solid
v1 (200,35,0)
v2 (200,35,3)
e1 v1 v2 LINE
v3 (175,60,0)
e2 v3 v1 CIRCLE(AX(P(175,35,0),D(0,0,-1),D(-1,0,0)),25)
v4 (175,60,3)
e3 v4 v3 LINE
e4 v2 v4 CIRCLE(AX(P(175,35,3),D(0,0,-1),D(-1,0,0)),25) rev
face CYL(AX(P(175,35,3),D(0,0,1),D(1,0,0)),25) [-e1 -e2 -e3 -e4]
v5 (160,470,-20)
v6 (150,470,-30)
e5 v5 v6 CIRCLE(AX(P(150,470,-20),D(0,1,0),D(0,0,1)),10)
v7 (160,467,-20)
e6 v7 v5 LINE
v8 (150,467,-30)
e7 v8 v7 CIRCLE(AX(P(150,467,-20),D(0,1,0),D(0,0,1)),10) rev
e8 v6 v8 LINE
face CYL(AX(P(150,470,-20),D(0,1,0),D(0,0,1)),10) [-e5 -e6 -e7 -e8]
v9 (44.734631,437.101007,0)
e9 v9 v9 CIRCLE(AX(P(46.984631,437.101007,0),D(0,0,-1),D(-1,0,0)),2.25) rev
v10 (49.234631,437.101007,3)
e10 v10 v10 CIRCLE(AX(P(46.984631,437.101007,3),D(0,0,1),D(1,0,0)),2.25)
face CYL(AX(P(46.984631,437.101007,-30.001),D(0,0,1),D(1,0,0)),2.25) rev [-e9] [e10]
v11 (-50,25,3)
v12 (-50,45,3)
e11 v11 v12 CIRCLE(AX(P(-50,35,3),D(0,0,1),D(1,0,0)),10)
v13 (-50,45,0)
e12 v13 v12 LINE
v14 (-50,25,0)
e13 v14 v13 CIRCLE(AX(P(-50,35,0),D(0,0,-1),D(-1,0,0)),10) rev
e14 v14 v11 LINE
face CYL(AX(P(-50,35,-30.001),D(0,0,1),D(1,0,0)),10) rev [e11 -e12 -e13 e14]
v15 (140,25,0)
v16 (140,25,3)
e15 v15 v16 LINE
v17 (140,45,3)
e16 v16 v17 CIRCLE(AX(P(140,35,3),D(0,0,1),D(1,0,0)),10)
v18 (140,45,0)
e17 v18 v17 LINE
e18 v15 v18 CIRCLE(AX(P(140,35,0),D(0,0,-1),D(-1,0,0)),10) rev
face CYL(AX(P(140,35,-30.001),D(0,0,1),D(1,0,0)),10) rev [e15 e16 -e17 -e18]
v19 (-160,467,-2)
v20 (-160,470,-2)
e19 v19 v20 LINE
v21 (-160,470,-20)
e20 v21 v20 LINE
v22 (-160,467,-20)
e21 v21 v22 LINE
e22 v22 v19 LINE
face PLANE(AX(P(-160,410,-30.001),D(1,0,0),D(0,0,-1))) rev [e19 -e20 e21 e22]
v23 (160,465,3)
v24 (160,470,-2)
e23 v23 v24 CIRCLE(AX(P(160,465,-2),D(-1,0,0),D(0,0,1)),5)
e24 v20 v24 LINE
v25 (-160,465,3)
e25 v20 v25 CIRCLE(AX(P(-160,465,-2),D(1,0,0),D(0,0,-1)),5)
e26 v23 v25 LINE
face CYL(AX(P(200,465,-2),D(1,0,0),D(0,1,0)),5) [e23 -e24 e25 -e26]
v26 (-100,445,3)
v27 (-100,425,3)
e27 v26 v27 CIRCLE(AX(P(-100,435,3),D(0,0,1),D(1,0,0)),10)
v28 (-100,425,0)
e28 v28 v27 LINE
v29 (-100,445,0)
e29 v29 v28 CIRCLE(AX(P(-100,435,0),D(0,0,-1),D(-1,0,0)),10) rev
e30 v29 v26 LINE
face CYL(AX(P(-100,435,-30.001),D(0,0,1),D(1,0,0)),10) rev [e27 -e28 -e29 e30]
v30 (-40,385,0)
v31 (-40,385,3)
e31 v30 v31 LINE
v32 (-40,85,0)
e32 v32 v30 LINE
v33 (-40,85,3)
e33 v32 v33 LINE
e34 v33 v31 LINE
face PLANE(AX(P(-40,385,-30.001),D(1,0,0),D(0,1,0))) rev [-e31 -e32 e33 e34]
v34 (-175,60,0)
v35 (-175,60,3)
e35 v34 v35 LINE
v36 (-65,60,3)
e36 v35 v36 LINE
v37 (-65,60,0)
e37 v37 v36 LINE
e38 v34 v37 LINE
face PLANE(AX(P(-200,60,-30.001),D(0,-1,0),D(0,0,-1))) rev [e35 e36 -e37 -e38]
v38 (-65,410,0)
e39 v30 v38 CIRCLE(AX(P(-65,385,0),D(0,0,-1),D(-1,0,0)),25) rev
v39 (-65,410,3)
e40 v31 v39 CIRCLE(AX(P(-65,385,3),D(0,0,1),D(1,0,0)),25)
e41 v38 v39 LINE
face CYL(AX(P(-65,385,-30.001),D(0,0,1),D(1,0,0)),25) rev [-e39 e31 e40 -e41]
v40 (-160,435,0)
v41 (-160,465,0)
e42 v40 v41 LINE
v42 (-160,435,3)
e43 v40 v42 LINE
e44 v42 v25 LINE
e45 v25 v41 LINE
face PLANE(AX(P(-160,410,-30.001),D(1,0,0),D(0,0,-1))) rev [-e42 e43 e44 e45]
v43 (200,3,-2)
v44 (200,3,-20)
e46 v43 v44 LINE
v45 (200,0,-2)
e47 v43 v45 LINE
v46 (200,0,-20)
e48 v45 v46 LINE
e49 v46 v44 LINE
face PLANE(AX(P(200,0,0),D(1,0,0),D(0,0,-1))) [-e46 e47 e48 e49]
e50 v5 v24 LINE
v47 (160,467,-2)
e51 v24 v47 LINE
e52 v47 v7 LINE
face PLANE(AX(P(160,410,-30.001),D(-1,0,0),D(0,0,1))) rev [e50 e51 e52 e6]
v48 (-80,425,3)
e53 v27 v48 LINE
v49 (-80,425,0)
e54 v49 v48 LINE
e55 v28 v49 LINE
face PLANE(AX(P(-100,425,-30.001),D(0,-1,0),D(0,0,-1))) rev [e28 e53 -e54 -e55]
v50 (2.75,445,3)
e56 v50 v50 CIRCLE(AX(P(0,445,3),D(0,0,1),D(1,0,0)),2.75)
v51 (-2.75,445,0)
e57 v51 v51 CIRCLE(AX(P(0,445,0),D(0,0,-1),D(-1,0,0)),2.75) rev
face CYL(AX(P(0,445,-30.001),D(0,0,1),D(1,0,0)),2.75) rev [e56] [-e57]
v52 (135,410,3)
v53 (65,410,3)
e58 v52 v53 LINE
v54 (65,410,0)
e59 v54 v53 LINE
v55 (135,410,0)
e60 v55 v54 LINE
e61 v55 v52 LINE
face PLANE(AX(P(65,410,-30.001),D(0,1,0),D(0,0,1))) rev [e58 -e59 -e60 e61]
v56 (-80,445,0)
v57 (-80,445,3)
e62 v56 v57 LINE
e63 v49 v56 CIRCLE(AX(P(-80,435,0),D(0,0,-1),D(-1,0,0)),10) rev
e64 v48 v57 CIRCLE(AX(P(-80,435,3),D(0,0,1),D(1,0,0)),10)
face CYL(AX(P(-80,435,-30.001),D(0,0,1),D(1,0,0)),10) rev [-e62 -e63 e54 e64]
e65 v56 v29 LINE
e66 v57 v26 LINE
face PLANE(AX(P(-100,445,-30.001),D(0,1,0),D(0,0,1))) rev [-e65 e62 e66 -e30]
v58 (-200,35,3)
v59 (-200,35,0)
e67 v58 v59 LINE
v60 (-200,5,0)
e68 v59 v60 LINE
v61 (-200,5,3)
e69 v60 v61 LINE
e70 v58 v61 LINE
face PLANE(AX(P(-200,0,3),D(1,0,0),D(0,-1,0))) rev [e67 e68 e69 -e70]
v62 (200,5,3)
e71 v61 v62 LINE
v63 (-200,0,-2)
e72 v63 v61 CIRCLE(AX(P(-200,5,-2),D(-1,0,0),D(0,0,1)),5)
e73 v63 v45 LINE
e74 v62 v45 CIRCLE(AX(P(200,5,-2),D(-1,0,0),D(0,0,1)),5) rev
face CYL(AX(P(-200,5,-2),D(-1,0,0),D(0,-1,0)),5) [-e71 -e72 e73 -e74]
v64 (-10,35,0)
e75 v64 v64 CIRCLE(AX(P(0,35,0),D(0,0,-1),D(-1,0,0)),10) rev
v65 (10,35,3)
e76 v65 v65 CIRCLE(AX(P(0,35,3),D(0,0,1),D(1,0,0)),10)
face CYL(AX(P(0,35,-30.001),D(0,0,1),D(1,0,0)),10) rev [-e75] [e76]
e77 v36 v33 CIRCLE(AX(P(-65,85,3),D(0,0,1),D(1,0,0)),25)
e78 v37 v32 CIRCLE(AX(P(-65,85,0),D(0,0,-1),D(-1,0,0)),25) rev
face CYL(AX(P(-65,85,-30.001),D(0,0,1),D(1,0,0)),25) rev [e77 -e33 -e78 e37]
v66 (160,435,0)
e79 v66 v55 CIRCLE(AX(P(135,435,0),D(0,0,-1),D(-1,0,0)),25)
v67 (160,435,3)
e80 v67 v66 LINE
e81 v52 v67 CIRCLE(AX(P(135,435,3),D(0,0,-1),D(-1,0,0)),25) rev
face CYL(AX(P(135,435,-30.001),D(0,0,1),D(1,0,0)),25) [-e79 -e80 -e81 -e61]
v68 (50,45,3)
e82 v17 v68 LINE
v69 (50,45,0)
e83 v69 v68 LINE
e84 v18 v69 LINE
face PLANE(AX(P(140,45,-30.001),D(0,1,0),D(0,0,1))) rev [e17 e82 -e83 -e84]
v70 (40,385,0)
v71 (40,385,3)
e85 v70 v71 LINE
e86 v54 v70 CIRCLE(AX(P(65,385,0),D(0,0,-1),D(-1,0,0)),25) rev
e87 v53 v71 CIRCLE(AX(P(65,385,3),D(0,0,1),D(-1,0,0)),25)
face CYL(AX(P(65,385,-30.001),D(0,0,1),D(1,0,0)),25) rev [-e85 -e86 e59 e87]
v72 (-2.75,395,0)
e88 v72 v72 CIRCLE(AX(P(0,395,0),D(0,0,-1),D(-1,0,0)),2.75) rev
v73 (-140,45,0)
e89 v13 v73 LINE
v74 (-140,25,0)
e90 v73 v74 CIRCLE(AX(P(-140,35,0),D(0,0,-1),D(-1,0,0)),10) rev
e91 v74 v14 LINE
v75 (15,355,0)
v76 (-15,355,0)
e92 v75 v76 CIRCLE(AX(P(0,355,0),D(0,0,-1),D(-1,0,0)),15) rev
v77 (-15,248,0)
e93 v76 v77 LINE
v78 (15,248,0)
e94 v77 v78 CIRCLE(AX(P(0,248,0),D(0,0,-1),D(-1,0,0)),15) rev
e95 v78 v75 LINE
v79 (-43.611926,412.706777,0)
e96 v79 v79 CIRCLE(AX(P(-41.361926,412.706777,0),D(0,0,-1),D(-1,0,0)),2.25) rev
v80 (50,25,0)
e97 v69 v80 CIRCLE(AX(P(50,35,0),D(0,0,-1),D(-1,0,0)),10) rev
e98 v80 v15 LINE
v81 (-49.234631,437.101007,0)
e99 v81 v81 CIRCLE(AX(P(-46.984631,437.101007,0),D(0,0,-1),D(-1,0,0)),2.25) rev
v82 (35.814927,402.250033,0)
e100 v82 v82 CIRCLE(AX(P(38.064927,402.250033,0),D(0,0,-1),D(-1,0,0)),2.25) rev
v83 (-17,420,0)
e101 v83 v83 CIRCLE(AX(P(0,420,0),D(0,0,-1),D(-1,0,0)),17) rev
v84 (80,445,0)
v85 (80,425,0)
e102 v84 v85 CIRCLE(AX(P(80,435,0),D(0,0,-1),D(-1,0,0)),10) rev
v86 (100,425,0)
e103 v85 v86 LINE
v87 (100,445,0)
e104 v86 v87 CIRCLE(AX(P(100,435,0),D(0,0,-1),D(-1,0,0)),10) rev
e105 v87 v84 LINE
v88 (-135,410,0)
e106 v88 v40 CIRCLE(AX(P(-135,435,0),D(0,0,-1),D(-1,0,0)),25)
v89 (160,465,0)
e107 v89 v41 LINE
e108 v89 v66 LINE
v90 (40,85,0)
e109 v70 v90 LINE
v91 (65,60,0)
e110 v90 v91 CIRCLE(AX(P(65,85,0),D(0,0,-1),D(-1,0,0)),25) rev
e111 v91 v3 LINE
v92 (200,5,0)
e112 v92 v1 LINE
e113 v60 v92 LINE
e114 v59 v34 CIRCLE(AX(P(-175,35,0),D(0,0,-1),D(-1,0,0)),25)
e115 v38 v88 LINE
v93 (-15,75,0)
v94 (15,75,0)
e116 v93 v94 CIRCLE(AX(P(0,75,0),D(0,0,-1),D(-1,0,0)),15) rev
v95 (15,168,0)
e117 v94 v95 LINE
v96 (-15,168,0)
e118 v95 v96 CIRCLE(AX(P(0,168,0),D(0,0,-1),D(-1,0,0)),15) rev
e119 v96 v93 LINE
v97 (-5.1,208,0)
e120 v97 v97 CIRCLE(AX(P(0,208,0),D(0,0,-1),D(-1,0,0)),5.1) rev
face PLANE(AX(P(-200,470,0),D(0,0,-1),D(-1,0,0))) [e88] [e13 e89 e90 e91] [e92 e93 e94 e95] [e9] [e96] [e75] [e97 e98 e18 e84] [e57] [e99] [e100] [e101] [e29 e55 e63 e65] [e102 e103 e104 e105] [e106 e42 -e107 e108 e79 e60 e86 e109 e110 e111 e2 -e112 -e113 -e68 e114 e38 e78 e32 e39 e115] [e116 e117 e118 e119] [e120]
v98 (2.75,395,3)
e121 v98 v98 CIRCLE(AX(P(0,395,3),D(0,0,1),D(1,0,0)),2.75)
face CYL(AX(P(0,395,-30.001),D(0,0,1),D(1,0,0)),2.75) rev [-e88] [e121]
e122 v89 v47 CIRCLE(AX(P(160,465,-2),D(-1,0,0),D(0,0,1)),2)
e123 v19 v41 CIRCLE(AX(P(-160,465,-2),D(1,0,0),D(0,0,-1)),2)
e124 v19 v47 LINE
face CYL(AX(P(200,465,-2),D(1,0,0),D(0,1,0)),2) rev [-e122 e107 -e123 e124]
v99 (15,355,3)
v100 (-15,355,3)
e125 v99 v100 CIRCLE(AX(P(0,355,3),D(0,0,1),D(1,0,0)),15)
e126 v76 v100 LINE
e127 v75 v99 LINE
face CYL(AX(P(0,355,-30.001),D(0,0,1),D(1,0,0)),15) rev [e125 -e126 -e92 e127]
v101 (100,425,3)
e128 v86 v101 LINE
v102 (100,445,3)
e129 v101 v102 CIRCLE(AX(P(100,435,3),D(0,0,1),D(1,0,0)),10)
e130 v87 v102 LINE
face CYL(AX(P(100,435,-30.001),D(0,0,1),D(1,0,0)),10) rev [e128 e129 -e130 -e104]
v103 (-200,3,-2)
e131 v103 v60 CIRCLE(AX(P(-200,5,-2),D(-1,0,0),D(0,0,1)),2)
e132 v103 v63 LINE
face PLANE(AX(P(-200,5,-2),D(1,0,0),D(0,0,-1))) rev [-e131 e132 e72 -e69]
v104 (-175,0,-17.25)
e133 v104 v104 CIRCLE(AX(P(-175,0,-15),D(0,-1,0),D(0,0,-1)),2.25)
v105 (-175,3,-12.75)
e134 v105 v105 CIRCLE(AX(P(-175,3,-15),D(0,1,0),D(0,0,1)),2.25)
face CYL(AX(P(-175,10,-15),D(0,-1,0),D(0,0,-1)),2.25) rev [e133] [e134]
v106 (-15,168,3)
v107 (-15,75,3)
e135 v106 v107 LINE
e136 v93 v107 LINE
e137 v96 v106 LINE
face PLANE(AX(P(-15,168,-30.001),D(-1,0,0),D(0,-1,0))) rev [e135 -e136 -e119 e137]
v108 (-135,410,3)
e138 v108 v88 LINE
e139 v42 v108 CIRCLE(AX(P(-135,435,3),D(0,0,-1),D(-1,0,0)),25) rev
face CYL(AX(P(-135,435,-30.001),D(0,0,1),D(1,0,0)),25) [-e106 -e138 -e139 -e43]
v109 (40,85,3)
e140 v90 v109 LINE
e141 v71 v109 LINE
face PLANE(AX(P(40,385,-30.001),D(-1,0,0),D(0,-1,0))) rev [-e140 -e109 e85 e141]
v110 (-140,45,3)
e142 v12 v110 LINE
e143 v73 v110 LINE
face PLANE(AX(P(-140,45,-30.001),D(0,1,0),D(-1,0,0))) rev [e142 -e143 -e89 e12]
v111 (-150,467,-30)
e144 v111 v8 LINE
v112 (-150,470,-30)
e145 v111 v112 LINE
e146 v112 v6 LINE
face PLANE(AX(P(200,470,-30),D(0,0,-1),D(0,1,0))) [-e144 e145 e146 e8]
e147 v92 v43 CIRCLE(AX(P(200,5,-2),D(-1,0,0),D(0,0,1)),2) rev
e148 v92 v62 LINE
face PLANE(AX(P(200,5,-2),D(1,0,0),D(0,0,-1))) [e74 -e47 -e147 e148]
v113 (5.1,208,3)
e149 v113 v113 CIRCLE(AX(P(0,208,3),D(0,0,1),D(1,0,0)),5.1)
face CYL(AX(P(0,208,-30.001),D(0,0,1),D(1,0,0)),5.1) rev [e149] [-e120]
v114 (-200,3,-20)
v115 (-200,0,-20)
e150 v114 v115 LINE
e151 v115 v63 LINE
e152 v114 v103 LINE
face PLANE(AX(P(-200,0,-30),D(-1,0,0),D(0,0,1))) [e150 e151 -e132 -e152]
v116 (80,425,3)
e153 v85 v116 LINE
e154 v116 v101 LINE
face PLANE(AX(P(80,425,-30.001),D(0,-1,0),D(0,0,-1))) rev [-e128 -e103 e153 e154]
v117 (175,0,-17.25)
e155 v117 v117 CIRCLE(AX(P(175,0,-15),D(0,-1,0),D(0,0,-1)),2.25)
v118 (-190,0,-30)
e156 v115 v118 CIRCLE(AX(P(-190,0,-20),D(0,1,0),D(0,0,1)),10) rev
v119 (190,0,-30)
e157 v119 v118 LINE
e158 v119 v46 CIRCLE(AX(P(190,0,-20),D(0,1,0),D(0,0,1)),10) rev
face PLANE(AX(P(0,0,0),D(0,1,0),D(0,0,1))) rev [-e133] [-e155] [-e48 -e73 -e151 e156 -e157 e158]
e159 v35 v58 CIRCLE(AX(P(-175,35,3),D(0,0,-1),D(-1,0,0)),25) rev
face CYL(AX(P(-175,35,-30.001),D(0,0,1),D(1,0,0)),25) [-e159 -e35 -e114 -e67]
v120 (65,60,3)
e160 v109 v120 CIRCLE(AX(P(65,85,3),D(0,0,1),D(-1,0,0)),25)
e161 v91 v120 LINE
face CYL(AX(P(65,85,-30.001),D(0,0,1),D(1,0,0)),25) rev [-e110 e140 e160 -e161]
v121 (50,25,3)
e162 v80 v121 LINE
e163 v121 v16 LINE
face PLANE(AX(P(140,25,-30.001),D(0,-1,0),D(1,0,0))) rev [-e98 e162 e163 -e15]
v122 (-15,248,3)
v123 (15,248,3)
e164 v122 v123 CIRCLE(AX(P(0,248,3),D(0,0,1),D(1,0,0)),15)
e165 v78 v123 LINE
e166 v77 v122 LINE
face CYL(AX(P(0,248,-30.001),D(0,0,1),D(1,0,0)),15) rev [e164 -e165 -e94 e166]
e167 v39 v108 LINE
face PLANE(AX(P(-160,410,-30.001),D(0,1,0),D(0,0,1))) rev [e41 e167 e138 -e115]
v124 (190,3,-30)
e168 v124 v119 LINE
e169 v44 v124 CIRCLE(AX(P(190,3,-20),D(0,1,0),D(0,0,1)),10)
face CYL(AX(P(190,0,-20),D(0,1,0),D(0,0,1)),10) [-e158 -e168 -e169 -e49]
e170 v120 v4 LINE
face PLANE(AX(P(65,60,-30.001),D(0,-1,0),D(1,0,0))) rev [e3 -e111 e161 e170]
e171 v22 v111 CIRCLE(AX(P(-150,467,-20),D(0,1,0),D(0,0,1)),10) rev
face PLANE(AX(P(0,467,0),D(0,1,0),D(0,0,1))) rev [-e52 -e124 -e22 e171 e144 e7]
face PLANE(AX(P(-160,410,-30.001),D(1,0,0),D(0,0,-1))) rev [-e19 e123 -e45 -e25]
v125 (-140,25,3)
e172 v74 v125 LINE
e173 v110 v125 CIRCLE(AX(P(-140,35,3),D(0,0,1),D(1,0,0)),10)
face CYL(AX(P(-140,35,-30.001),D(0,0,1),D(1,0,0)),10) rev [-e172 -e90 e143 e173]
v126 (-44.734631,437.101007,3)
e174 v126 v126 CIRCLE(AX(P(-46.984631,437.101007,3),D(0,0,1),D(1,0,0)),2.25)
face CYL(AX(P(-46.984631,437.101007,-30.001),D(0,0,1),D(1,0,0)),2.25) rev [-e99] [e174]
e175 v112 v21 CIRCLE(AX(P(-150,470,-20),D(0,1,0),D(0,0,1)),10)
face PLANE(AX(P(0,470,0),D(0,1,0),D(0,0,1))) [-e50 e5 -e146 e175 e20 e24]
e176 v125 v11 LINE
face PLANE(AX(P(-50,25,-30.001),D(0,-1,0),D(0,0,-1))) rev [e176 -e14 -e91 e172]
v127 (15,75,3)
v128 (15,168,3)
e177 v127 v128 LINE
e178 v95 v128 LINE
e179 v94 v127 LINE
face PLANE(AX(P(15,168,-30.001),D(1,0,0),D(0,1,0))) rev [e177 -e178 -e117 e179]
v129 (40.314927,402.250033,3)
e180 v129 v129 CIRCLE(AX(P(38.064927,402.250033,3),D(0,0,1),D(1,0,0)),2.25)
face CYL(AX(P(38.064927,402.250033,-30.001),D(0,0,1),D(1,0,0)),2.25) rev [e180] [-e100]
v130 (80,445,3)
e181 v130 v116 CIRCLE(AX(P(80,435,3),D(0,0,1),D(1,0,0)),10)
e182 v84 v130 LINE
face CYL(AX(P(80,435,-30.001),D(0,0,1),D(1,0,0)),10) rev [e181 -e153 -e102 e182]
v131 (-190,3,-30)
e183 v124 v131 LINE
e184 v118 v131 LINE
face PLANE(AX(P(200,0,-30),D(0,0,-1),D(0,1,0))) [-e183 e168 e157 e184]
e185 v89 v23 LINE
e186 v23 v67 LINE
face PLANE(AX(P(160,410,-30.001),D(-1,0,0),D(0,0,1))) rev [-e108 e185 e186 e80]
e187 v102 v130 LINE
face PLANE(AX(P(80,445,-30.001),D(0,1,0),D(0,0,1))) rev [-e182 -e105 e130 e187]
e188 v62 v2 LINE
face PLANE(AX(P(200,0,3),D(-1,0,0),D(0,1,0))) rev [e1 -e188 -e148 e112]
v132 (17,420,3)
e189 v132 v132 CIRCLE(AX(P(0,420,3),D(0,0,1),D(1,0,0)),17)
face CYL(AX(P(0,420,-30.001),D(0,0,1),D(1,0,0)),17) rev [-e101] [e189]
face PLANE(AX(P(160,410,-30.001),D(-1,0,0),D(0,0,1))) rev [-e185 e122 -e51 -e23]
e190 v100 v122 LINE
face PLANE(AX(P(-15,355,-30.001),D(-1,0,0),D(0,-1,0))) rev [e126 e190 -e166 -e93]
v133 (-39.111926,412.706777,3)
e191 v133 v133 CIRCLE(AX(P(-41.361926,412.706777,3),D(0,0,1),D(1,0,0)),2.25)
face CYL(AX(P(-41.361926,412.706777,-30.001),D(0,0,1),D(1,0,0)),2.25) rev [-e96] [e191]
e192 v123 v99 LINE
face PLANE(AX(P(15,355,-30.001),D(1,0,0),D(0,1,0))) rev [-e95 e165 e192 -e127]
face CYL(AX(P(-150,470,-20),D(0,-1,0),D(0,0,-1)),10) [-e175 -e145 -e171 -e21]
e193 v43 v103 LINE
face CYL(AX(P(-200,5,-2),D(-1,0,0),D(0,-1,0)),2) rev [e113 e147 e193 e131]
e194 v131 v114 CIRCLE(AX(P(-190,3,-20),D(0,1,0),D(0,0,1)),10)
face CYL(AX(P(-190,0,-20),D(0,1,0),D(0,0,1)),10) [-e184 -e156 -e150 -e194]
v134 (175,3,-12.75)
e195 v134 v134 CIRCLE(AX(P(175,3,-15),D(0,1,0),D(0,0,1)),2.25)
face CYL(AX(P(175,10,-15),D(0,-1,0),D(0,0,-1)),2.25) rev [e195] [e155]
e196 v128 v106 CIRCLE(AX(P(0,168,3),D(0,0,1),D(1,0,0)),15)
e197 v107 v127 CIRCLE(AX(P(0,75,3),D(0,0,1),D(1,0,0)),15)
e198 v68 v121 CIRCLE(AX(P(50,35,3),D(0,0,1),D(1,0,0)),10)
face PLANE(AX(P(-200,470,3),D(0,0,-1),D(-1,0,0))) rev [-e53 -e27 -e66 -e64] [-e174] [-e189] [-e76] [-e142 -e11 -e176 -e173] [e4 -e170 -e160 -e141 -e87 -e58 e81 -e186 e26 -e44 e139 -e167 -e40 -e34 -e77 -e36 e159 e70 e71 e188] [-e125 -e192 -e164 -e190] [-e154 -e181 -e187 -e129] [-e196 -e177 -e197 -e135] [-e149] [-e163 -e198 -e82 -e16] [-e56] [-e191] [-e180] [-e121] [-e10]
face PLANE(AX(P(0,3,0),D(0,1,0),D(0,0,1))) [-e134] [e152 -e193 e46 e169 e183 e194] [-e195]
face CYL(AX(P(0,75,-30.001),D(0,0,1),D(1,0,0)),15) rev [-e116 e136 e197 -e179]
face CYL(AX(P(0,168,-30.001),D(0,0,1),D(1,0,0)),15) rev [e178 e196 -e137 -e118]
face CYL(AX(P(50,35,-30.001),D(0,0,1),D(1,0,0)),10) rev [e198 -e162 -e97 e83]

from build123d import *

# Parameters (mm, degrees)
ESQUISSE1_W                             = 400
ESQUISSE1_H                             = 470
BOSS_EXTRU_1_DEPTH                      = 3
T_LE_PLI_E_SUR_AR_TE1_STRIP_W           = 16
T_LE_PLI_E_SUR_AR_TE1_STRIP_H           = 3
T_LE_PLI_E_SUR_AR_TE1_STRIP_CUT_DEPTH   = 400
T_LE_PLI_E_SUR_AR_TE1_STRIP_2_W         = 16
T_LE_PLI_E_SUR_AR_TE1_STRIP_2_H         = 3
T_LE_PLI_E_SUR_AR_TE1_STRIP_CUT_2_DEPTH = 400
T_LE_PLI_E_SUR_AR_TE1_DEPTH             = 400
T_LE_PLI_E_SUR_AR_TE1_BEND_DEPTH        = 400
ENL_V_MAT_EXTRU_1_REACH                 = 513.849
ESQUISSE7_R                             = 17
ESQUISSE7_R_2                           = 5.1
ESQUISSE7_R_3                           = 2.75
ENL_V_MAT_EXTRU_2_REACH                 = 513.849
ESQUISSE12_R                            = 2.25
ESQUISSE12_R_2                          = 10
CONG_10_R                               = 10
CONG_2_R                                = 25
ESQUISSE13_R                            = 2.25
ENL_V_MAT_EXTRU_3_DEPTH                 = 10


# Sheet-metal steps are written as plain solids
with BuildPart() as part:
    # Esquisse1 → Boss.-Extru.1 (new body)
    with BuildSketch(Plane.XY):
        with Locations((0, 235)):
            Rectangle(ESQUISSE1_W, ESQUISSE1_H)
    extrude(amount=BOSS_EXTRU_1_DEPTH)

    # Tôle pliée sur arête1 strip (across the edge) → Tôle pliée sur arête1 strip cut (cut)
    with BuildSketch(Plane(origin=(-200, 470, 0), x_dir=(0, -1, 0), z_dir=(1, 0, 0))):
        with Locations((-3, -1.5)):
            Rectangle(T_LE_PLI_E_SUR_AR_TE1_STRIP_W, T_LE_PLI_E_SUR_AR_TE1_STRIP_H)
    extrude(amount=T_LE_PLI_E_SUR_AR_TE1_STRIP_CUT_DEPTH, mode=Mode.SUBTRACT)

    # Tôle pliée sur arête1 strip 2 (across the edge) → Tôle pliée sur arête1 strip cut 2 (cut)
    with BuildSketch(Plane(origin=(200, 0, 0), x_dir=(0, 1, 0), z_dir=(-1, 0, 0))):
        with Locations((-3, -1.5)):
            Rectangle(T_LE_PLI_E_SUR_AR_TE1_STRIP_2_W, T_LE_PLI_E_SUR_AR_TE1_STRIP_2_H)
    extrude(amount=T_LE_PLI_E_SUR_AR_TE1_STRIP_CUT_2_DEPTH, mode=Mode.SUBTRACT)

    # Tôle pliée sur arête1 section (across the edge) → Tôle pliée sur arête1 (add)
    with BuildSketch(Plane(origin=(-200, 470, 0), x_dir=(0, -1, 0), z_dir=(1, 0, 0))):
        with BuildLine():
            Line((0, 2), (0, 30))
            Line((0, 30), (3, 30))
            Line((3, 30), (3, 2))
            ThreePointArc((3, 2), (3.585786438, 0.585786438), (5, 0))
            Line((5, 0), (5, -3))
            ThreePointArc((5, -3), (1.464466094, -1.535533906), (0, 2))
        make_face()
    extrude(amount=T_LE_PLI_E_SUR_AR_TE1_DEPTH)

    # Tôle pliée sur arête1 section 2 (across the edge) → Tôle pliée sur arête1 bend (add)
    with BuildSketch(Plane(origin=(200, 0, 0), x_dir=(0, 1, 0), z_dir=(-1, 0, 0))):
        with BuildLine():
            Line((0, 2), (0, 30))
            Line((0, 30), (3, 30))
            Line((3, 30), (3, 2))
            ThreePointArc((3, 2), (3.585786438, 0.585786438), (5, 0))
            Line((5, 0), (5, -3))
            ThreePointArc((5, -3), (1.464466094, -1.535533906), (0, 2))
        make_face()
    extrude(amount=T_LE_PLI_E_SUR_AR_TE1_BEND_DEPTH)

    # Esquisse7 → Enlèv. mat.-Extru.1 (cut, up to next)
    with BuildSketch(Plane.XY.offset(3), mode=Mode.PRIVATE) as enl_v_mat_extru_1_sk1:
        with Locations((0, 420)):
            Circle(ESQUISSE7_R)
    enl_v_mat_extru_1_tool1 = extrude(enl_v_mat_extru_1_sk1.sketch, amount=-ENL_V_MAT_EXTRU_1_REACH, mode=Mode.PRIVATE) & part.part
    # Esquisse7 → Enlèv. mat.-Extru.1 (cut, up to next)
    with BuildSketch(Plane.XY.offset(3), mode=Mode.PRIVATE) as enl_v_mat_extru_1_sk2:
        with Locations((0, 208)):
            Circle(ESQUISSE7_R_2)
    enl_v_mat_extru_1_tool2 = extrude(enl_v_mat_extru_1_sk2.sketch, amount=-ENL_V_MAT_EXTRU_1_REACH, mode=Mode.PRIVATE) & part.part
    # Esquisse7 → Enlèv. mat.-Extru.1 (cut, up to next)
    with BuildSketch(Plane.XY.offset(3), mode=Mode.PRIVATE) as enl_v_mat_extru_1_sk3:
        with Locations((0, 395)):
            Circle(ESQUISSE7_R_3)
    enl_v_mat_extru_1_tool3 = extrude(enl_v_mat_extru_1_sk3.sketch, amount=-ENL_V_MAT_EXTRU_1_REACH, mode=Mode.PRIVATE) & part.part
    # Esquisse7 → Enlèv. mat.-Extru.1 (cut, up to next)
    with BuildSketch(Plane.XY.offset(3), mode=Mode.PRIVATE) as enl_v_mat_extru_1_sk4:
        with Locations((0, 445)):
            Circle(ESQUISSE7_R_3)
    enl_v_mat_extru_1_tool4 = extrude(enl_v_mat_extru_1_sk4.sketch, amount=-ENL_V_MAT_EXTRU_1_REACH, mode=Mode.PRIVATE) & part.part
    # Esquisse7 → Enlèv. mat.-Extru.1 (cut, up to next)
    with BuildSketch(Plane.XY.offset(3), mode=Mode.PRIVATE) as enl_v_mat_extru_1_sk5:
        with BuildLine():
            Line((-200, 60), (-65, 60))
            ThreePointArc((-65, 60), (-47.32233047, 67.32233047), (-40, 85))
            Line((-40, 85), (-40, 385))
            ThreePointArc((-40, 385), (-47.32233047, 402.67766953), (-65, 410))
            Line((-65, 410), (-160, 410))
            Line((-160, 410), (-160, 470))
            Line((-160, 470), (-200, 470))
            Line((-200, 470), (-200, 60))
        make_face()
    enl_v_mat_extru_1_tool5 = extrude(enl_v_mat_extru_1_sk5.sketch, amount=-ENL_V_MAT_EXTRU_1_REACH, mode=Mode.PRIVATE) & part.part
    # Esquisse7 → Enlèv. mat.-Extru.1 (cut, up to next)
    with BuildSketch(Plane.XY.offset(3), mode=Mode.PRIVATE) as enl_v_mat_extru_1_sk6:
        with BuildLine():
            Line((200.093993977, 470), (200.093993977, 60))
            Line((200.093993977, 60), (65, 60))
            ThreePointArc((65, 60), (47.32233047, 67.32233047), (40, 85))
            Line((40, 85), (40, 385))
            ThreePointArc((40, 385), (47.32233047, 402.67766953), (65, 410))
            Line((65, 410), (160, 410))
            Line((160, 410), (160, 470))
            Line((160, 470), (200.093993977, 470))
        make_face()
    enl_v_mat_extru_1_tool6 = extrude(enl_v_mat_extru_1_sk6.sketch, amount=-ENL_V_MAT_EXTRU_1_REACH, mode=Mode.PRIVATE) & part.part
    add(enl_v_mat_extru_1_tool1.solids().sort_by_distance((0, 420, 3))[0], mode=Mode.SUBTRACT)
    add(enl_v_mat_extru_1_tool2.solids().sort_by_distance((0, 208, 3))[0], mode=Mode.SUBTRACT)
    add(enl_v_mat_extru_1_tool3.solids().sort_by_distance((0, 395, 3))[0], mode=Mode.SUBTRACT)
    add(enl_v_mat_extru_1_tool4.solids().sort_by_distance((0, 445, 3))[0], mode=Mode.SUBTRACT)
    add(enl_v_mat_extru_1_tool5.solids().sort_by_distance((-122.820528, 243.463534, 3))[0], mode=Mode.SUBTRACT)
    add(enl_v_mat_extru_1_tool6.solids().sort_by_distance((122.87169, 243.477801, 3))[0], mode=Mode.SUBTRACT)

    # Esquisse12 → Enlèv. mat.-Extru.2 (cut, up to next)
    with BuildSketch(Plane.XY.offset(3), mode=Mode.PRIVATE) as enl_v_mat_extru_2_sk1:
        with Locations((38.064927056, 402.250033007)):
            Circle(ESQUISSE12_R)
    enl_v_mat_extru_2_tool1 = extrude(enl_v_mat_extru_2_sk1.sketch, amount=-ENL_V_MAT_EXTRU_2_REACH, mode=Mode.PRIVATE) & part.part
    # Esquisse12 → Enlèv. mat.-Extru.2 (cut, up to next)
    with BuildSketch(Plane.XY.offset(3), mode=Mode.PRIVATE) as enl_v_mat_extru_2_sk2:
        with Locations((-41.361925627, 412.706776538)):
            Circle(ESQUISSE12_R)
    enl_v_mat_extru_2_tool2 = extrude(enl_v_mat_extru_2_sk2.sketch, amount=-ENL_V_MAT_EXTRU_2_REACH, mode=Mode.PRIVATE) & part.part
    # Esquisse12 → Enlèv. mat.-Extru.2 (cut, up to next)
    with BuildSketch(Plane.XY.offset(3), mode=Mode.PRIVATE) as enl_v_mat_extru_2_sk3:
        with Locations((46.984631039, 437.101007166)):
            Circle(ESQUISSE12_R)
    enl_v_mat_extru_2_tool3 = extrude(enl_v_mat_extru_2_sk3.sketch, amount=-ENL_V_MAT_EXTRU_2_REACH, mode=Mode.PRIVATE) & part.part
    # Esquisse12 → Enlèv. mat.-Extru.2 (cut, up to next)
    with BuildSketch(Plane.XY.offset(3), mode=Mode.PRIVATE) as enl_v_mat_extru_2_sk4:
        with Locations((-46.984631039, 437.101007166)):
            Circle(ESQUISSE12_R)
    enl_v_mat_extru_2_tool4 = extrude(enl_v_mat_extru_2_sk4.sketch, amount=-ENL_V_MAT_EXTRU_2_REACH, mode=Mode.PRIVATE) & part.part
    # Esquisse12 → Enlèv. mat.-Extru.2 (cut, up to next)
    with BuildSketch(Plane.XY.offset(3), mode=Mode.PRIVATE) as enl_v_mat_extru_2_sk5:
        with Locations((0, 35)):
            Circle(ESQUISSE12_R_2)
    enl_v_mat_extru_2_tool5 = extrude(enl_v_mat_extru_2_sk5.sketch, amount=-ENL_V_MAT_EXTRU_2_REACH, mode=Mode.PRIVATE) & part.part
    # Esquisse12 → Enlèv. mat.-Extru.2 (cut, up to next)
    with BuildSketch(Plane.XY.offset(3), mode=Mode.PRIVATE) as enl_v_mat_extru_2_sk6:
        with BuildLine():
            Line((-15, 168), (-15, 75))
            ThreePointArc((-15, 75), (0, 60), (15, 75))
            Line((15, 75), (15, 168))
            ThreePointArc((15, 168), (0, 183), (-15, 168))
        make_face()
    enl_v_mat_extru_2_tool6 = extrude(enl_v_mat_extru_2_sk6.sketch, amount=-ENL_V_MAT_EXTRU_2_REACH, mode=Mode.PRIVATE) & part.part
    # Esquisse12 → Enlèv. mat.-Extru.2 (cut, up to next)
    with BuildSketch(Plane.XY.offset(3), mode=Mode.PRIVATE) as enl_v_mat_extru_2_sk7:
        with BuildLine():
            Line((140, 45), (50, 45))
            ThreePointArc((50, 45), (40, 35), (50, 25))
            Line((50, 25), (140, 25))
            ThreePointArc((140, 25), (150, 35), (140, 45))
        make_face()
    enl_v_mat_extru_2_tool7 = extrude(enl_v_mat_extru_2_sk7.sketch, amount=-ENL_V_MAT_EXTRU_2_REACH, mode=Mode.PRIVATE) & part.part
    # Esquisse12 → Enlèv. mat.-Extru.2 (cut, up to next)
    with BuildSketch(Plane.XY.offset(3), mode=Mode.PRIVATE) as enl_v_mat_extru_2_sk8:
        with BuildLine():
            Line((15, 355), (15, 248))
            ThreePointArc((15, 248), (0, 233), (-15, 248))
            Line((-15, 248), (-15, 355))
            ThreePointArc((-15, 355), (0, 370), (15, 355))
        make_face()
    enl_v_mat_extru_2_tool8 = extrude(enl_v_mat_extru_2_sk8.sketch, amount=-ENL_V_MAT_EXTRU_2_REACH, mode=Mode.PRIVATE) & part.part
    # Esquisse12 → Enlèv. mat.-Extru.2 (cut, up to next)
    with BuildSketch(Plane.XY.offset(3), mode=Mode.PRIVATE) as enl_v_mat_extru_2_sk9:
        with BuildLine():
            Line((-140, 45), (-50, 45))
            ThreePointArc((-50, 45), (-40, 35), (-50, 25))
            Line((-50, 25), (-140, 25))
            ThreePointArc((-140, 25), (-150, 35), (-140, 45))
        make_face()
    enl_v_mat_extru_2_tool9 = extrude(enl_v_mat_extru_2_sk9.sketch, amount=-ENL_V_MAT_EXTRU_2_REACH, mode=Mode.PRIVATE) & part.part
    # Esquisse12 → Enlèv. mat.-Extru.2 (cut, up to next)
    with BuildSketch(Plane.XY.offset(3), mode=Mode.PRIVATE) as enl_v_mat_extru_2_sk10:
        with BuildLine():
            Line((-100, 425), (-80, 425))
            ThreePointArc((-80, 425), (-70, 435), (-80, 445))
            Line((-80, 445), (-100, 445))
            ThreePointArc((-100, 445), (-110, 435), (-100, 425))
        make_face()
    enl_v_mat_extru_2_tool10 = extrude(enl_v_mat_extru_2_sk10.sketch, amount=-ENL_V_MAT_EXTRU_2_REACH, mode=Mode.PRIVATE) & part.part
    # Esquisse12 → Enlèv. mat.-Extru.2 (cut, up to next)
    with BuildSketch(Plane.XY.offset(3), mode=Mode.PRIVATE) as enl_v_mat_extru_2_sk11:
        with BuildLine():
            Line((80, 445), (100, 445))
            ThreePointArc((100, 445), (110, 435), (100, 425))
            Line((100, 425), (80, 425))
            ThreePointArc((80, 425), (70, 435), (80, 445))
        make_face()
    enl_v_mat_extru_2_tool11 = extrude(enl_v_mat_extru_2_sk11.sketch, amount=-ENL_V_MAT_EXTRU_2_REACH, mode=Mode.PRIVATE) & part.part
    add(enl_v_mat_extru_2_tool1.solids().sort_by_distance((38.064927, 402.250033, 3))[0], mode=Mode.SUBTRACT)
    add(enl_v_mat_extru_2_tool2.solids().sort_by_distance((-41.361926, 412.706777, 3))[0], mode=Mode.SUBTRACT)
    add(enl_v_mat_extru_2_tool3.solids().sort_by_distance((46.984631, 437.101007, 3))[0], mode=Mode.SUBTRACT)
    add(enl_v_mat_extru_2_tool4.solids().sort_by_distance((-46.984631, 437.101007, 3))[0], mode=Mode.SUBTRACT)
    add(enl_v_mat_extru_2_tool5.solids().sort_by_distance((0, 35, 3))[0], mode=Mode.SUBTRACT)
    add(enl_v_mat_extru_2_tool6.solids().sort_by_distance((0, 121.5, 3))[0], mode=Mode.SUBTRACT)
    add(enl_v_mat_extru_2_tool7.solids().sort_by_distance((95, 35, 3))[0], mode=Mode.SUBTRACT)
    add(enl_v_mat_extru_2_tool8.solids().sort_by_distance((0, 301.5, 3))[0], mode=Mode.SUBTRACT)
    add(enl_v_mat_extru_2_tool9.solids().sort_by_distance((-95, 35, 3))[0], mode=Mode.SUBTRACT)
    add(enl_v_mat_extru_2_tool10.solids().sort_by_distance((-90, 435, 3))[0], mode=Mode.SUBTRACT)
    add(enl_v_mat_extru_2_tool11.solids().sort_by_distance((90, 435, 3))[0], mode=Mode.SUBTRACT)

    # Congé 10
    cong_10_edges = [part.edges().sort_by_distance(p)[0] for p in [
        (160, 468.5, -30),
        (200, 1.5, -30),
        (-200, 1.5, -30),
        (-160, 468.5, -30),
    ]]
    fillet(cong_10_edges, radius=CONG_10_R)

    # Congé2
    cong_2_edges = [part.edges().sort_by_distance(p)[0] for p in [
        (200, 60, 1.5),
        (160, 410, 1.5),
        (-200, 60, 1.5),
        (-160, 410, 1.5),
    ]]
    fillet(cong_2_edges, radius=CONG_2_R)

    # Esquisse13 → Enlèv. mat.-Extru.3 (cut)
    with BuildSketch(Plane(origin=(0, 0, 0), x_dir=(-1, 0, 0), z_dir=(0, -1, 0))):
        with Locations(Location((175, 15, 0), (0, 0, 90))):
            Circle(ESQUISSE13_R)
        with Locations(Location((-175, 15, 0), (0, 0, 90))):
            Circle(ESQUISSE13_R)
    extrude(amount=-ENL_V_MAT_EXTRU_3_DEPTH, mode=Mode.SUBTRACT)


solid = part.part
